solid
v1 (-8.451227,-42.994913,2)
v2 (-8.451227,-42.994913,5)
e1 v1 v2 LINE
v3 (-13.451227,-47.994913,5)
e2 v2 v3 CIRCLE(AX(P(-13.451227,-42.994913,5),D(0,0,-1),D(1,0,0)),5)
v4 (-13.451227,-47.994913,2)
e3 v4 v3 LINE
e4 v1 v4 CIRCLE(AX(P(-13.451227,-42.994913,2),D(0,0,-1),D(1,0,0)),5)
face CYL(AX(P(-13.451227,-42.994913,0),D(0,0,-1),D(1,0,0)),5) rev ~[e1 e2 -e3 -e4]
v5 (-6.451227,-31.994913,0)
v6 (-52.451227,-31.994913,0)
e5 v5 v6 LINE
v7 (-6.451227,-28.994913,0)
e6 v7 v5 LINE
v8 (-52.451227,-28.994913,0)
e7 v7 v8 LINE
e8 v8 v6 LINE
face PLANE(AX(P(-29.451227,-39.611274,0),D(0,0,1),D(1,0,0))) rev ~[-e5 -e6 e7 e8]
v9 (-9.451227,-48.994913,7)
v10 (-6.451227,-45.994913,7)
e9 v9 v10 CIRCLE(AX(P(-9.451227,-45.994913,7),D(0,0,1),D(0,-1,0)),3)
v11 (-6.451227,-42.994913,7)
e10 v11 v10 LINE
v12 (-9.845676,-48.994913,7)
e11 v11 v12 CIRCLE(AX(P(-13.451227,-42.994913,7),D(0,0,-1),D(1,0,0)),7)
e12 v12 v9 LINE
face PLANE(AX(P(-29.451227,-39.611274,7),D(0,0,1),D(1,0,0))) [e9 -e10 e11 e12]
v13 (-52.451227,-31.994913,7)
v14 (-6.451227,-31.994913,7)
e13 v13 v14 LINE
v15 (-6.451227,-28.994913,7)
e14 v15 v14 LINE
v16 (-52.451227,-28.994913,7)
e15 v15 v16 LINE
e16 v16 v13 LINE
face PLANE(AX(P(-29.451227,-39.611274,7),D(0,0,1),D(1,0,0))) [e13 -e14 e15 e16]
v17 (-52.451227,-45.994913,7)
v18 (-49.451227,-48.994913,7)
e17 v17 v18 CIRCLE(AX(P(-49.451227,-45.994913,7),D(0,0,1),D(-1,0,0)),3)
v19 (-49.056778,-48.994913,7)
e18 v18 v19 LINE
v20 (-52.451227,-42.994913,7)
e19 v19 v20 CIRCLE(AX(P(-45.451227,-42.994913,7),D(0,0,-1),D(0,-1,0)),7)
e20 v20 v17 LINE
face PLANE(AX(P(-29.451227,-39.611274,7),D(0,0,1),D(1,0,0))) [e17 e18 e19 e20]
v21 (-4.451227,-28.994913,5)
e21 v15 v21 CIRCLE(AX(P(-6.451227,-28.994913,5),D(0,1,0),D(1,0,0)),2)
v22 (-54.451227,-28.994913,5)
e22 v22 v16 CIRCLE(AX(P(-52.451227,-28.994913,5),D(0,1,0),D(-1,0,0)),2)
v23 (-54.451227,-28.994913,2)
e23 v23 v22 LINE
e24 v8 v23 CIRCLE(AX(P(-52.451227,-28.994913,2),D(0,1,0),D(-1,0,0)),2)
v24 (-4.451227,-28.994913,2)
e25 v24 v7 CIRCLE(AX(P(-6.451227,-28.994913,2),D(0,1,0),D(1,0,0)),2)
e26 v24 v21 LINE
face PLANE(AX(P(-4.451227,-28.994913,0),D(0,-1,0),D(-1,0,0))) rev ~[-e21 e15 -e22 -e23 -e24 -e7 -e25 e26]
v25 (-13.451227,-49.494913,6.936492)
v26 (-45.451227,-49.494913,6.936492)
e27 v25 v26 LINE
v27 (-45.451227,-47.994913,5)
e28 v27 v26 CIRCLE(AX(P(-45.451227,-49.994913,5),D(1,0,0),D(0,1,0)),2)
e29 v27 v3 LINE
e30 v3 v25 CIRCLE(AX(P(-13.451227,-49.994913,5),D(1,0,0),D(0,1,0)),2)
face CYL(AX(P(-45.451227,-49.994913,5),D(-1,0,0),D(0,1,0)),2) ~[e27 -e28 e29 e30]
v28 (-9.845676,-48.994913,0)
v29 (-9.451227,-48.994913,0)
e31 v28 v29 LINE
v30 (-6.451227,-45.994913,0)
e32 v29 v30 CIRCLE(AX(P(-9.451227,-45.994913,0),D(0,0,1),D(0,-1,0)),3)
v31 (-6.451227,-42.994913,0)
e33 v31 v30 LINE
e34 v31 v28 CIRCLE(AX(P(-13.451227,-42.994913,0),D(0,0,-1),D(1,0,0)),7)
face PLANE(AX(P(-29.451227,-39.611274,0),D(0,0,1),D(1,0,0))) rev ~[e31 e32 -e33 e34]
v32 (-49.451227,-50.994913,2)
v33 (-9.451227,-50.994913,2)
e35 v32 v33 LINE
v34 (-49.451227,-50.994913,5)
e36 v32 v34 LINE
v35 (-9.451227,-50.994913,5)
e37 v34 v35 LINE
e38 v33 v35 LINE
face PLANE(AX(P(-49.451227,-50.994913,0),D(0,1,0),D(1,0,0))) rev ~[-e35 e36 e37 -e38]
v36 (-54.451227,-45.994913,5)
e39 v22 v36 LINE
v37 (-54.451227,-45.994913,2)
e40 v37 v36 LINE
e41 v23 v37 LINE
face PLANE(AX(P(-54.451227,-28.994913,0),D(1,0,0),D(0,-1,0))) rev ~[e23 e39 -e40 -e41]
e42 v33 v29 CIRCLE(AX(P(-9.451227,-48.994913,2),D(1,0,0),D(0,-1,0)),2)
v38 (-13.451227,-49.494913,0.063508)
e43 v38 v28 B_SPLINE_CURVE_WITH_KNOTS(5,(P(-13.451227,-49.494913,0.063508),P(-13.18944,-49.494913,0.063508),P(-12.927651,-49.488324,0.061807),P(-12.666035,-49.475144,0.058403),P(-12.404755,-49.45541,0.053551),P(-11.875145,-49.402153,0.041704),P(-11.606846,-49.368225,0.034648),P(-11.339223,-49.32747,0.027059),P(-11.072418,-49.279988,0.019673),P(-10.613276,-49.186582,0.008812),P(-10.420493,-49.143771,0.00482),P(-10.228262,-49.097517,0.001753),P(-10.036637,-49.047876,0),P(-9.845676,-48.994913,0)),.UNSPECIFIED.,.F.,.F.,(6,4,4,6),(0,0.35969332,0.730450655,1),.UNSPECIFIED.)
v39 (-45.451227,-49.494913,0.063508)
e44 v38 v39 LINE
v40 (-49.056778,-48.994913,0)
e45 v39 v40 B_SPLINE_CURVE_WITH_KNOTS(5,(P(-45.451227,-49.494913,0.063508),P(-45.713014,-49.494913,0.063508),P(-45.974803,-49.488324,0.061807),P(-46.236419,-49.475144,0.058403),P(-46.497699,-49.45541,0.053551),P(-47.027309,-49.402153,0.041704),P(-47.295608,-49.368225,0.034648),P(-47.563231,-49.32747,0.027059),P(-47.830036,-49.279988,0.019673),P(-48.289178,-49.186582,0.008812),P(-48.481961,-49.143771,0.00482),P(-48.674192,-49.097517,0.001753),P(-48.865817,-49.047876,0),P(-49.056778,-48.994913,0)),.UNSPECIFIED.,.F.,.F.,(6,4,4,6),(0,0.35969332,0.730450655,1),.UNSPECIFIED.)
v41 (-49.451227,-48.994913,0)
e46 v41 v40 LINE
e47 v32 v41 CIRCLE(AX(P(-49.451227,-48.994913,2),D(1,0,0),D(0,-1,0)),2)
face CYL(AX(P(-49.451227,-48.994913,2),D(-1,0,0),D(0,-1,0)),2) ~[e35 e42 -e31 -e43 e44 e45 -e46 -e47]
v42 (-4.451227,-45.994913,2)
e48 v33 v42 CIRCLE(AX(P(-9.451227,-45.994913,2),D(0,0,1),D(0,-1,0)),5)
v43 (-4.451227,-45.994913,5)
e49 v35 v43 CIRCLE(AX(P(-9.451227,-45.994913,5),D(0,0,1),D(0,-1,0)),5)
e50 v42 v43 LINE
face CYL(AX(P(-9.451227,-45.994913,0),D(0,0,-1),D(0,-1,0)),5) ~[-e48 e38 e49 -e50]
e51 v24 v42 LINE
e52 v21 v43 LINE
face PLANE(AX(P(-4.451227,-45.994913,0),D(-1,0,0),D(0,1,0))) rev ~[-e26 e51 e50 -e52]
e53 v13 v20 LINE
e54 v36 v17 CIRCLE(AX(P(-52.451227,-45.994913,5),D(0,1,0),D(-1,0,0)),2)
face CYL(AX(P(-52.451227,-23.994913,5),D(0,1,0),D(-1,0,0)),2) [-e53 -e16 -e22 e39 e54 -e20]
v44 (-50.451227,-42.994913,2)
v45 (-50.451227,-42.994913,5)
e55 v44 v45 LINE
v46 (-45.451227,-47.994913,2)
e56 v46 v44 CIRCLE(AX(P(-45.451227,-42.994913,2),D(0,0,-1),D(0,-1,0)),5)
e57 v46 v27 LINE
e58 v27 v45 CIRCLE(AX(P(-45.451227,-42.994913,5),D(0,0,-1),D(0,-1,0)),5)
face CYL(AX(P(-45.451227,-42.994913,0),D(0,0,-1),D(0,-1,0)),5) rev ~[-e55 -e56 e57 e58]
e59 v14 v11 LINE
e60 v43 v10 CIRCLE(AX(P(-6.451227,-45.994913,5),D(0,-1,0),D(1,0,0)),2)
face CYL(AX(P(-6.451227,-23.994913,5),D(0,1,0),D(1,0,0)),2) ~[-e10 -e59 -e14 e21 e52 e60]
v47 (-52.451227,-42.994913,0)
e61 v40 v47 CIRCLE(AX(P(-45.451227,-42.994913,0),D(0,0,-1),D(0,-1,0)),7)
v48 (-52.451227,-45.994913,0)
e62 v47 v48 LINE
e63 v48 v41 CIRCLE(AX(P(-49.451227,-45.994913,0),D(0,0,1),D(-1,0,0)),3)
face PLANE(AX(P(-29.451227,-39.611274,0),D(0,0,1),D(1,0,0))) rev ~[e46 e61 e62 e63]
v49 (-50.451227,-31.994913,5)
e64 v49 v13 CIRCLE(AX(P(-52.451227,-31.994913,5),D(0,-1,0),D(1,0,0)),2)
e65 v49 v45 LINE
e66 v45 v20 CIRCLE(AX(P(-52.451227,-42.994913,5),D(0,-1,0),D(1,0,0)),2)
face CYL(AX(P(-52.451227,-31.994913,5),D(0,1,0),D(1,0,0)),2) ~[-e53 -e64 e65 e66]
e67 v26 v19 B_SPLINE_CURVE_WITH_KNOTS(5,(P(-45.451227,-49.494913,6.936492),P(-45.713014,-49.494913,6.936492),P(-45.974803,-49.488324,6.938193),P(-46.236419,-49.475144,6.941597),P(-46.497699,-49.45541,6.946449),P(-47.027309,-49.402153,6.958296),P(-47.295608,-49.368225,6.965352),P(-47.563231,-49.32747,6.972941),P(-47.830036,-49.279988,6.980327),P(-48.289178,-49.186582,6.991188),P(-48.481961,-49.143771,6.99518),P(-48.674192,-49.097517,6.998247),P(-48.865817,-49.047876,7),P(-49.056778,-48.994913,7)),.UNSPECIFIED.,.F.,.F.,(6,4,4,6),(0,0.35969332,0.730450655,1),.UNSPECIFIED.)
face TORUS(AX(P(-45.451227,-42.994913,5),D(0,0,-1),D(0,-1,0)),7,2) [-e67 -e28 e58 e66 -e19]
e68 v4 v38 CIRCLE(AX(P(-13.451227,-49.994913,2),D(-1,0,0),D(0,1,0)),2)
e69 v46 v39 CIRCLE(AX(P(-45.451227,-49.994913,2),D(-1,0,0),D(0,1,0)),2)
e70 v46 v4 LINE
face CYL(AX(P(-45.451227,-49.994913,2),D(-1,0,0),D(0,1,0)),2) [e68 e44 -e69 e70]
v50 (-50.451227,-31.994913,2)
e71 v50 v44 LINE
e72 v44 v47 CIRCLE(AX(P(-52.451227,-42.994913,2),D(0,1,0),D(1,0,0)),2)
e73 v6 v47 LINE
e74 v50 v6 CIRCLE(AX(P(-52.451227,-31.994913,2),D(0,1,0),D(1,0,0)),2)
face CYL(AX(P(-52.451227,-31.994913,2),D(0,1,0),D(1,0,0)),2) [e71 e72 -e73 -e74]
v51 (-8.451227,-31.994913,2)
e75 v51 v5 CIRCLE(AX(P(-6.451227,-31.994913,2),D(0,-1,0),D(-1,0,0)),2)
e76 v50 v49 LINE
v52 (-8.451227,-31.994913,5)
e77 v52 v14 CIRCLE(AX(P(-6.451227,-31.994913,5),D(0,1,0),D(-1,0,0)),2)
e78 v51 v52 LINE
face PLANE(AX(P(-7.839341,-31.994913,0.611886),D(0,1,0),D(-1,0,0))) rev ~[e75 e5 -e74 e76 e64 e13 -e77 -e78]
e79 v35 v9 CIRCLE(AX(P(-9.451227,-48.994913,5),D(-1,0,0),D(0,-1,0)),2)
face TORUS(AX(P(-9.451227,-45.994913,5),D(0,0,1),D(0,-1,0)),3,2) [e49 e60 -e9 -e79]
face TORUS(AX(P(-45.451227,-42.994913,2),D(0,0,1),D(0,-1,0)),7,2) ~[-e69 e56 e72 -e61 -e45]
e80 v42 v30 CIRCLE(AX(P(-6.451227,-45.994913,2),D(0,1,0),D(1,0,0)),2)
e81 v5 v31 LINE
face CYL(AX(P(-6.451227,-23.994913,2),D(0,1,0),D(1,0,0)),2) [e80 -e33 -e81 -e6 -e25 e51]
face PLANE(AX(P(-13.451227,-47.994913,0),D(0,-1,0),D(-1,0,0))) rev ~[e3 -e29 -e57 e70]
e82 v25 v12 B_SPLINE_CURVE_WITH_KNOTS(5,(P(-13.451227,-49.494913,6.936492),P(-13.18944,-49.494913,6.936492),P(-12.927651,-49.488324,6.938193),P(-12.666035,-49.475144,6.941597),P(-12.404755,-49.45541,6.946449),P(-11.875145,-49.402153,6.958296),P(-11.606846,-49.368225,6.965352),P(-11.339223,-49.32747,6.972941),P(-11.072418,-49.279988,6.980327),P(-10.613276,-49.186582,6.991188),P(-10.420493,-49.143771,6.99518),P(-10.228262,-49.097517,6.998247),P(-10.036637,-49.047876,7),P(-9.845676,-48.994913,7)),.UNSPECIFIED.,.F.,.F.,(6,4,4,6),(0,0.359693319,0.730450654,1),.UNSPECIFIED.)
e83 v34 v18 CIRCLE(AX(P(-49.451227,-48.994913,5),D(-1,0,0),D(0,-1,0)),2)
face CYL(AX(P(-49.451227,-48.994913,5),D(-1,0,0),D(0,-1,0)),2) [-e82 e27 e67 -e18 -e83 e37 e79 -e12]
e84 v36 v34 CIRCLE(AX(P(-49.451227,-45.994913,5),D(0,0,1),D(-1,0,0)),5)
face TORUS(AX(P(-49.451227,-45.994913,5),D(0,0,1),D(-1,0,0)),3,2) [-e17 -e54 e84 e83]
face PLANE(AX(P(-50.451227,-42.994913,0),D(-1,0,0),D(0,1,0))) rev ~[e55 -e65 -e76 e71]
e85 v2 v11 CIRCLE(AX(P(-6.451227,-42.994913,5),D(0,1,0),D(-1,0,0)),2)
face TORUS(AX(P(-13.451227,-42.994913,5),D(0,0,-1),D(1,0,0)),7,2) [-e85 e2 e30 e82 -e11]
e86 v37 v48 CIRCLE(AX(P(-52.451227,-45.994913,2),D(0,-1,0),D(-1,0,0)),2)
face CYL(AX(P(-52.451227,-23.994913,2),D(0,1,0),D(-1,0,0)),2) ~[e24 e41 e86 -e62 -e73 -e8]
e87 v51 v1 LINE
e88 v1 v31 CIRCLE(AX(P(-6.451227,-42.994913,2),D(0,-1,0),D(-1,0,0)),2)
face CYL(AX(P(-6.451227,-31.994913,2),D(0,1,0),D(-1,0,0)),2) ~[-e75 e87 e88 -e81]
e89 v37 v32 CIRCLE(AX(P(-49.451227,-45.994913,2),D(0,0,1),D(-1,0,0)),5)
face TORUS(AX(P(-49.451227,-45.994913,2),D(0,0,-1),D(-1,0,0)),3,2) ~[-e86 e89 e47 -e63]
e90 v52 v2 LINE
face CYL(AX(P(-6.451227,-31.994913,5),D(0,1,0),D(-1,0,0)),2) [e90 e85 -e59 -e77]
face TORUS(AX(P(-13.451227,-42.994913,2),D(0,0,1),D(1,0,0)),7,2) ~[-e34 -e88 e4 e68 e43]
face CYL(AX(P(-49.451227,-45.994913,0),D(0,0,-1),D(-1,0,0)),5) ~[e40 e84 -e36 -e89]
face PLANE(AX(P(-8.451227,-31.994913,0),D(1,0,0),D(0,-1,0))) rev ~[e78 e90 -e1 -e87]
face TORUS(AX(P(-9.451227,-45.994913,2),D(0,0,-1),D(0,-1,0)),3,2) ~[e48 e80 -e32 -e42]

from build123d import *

# Parameters (mm, degrees)
F1_DEPTH     = 7
F2_T1_DEPTH  = 32
F2_T3_DEPTH  = 40
F2_T5_DEPTH  = 22
F2_T7_DEPTH  = 11
F2_T10_ANGLE = 90
F2_T12_ANGLE = 90
F2_T14_ANGLE = 90
F2_T16_ANGLE = 90
F2_T18_ANGLE = 90
F2_T20_ANGLE = 90
F2_T22_ANGLE = 90
F2_T24_ANGLE = 90


# Not quite as in the source:
# - a fillet or chamfer that OpenCascade refuses, or shapes differently, is made with other operations: its cross-section is extruded or revolved along the edge and cut away or added


with BuildPart() as f1:
    # F0 (on Top) → F1 (new body)
    with BuildSketch(Plane.XY):
        with BuildLine():
            Line((-4.4512270018, -28.9949133558), (-54.4512270018, -28.9949133558))
            Line((-54.4512270018, -28.9949133558), (-54.4512270018, -45.9949133558))
            ThreePointArc((-54.4512270018, -45.9949133558), (-52.9867609078, -49.5304472618), (-49.4512270018, -50.9949133558))
            Line((-49.4512270018, -50.9949133558), (-9.4512270018, -50.9949133558))
            ThreePointArc((-9.4512270018, -50.9949133558), (-5.9156930959, -49.5304472618), (-4.4512270018, -45.9949133558))
            Line((-4.4512270018, -45.9949133558), (-4.4512270018, -28.9949133558))
        make_face()
        with BuildLine():
            Line((-50.4512270018, -42.9949133558), (-50.4512270018, -31.9949133558))
            Line((-50.4512270018, -31.9949133558), (-8.4512270018, -31.9949133558))
            Line((-8.4512270018, -31.9949133558), (-8.4512270018, -42.9949133558))
            ThreePointArc((-8.4512270018, -42.9949133558), (-9.9156930959, -46.5304472618), (-13.4512270018, -47.9949133558))
            Line((-13.4512270018, -47.9949133558), (-45.4512270018, -47.9949133558))
            ThreePointArc((-45.4512270018, -47.9949133558), (-48.9867609078, -46.5304472618), (-50.4512270018, -42.9949133558))
        make_face(mode=Mode.SUBTRACT)
    extrude(amount=F1_DEPTH)

    # F2: fillet of radius 2 on 4 edges, made by hand

    # F2_s2 → F2_t1 (cut)
    with BuildSketch(Plane.YZ.offset(-45.4512270018)):
        with BuildLine():
            ThreePointArc((-47.9949133558, 5), (-48.5806997934, 6.4142135624), (-49.9949133558, 7))
            Line((-49.9949133558, 7), (-47.9949133558, 7))
            Line((-47.9949133558, 7), (-47.9949133558, 5))
        make_face()
        with BuildLine():
            ThreePointArc((-47.9949133558, 2), (-48.5806997934, 0.5857864376), (-49.9949133558, 0))
            Line((-49.9949133558, 0), (-47.9949133558, 0))
            Line((-47.9949133558, 0), (-47.9949133558, 2))
        make_face()
    extrude(amount=F2_T1_DEPTH, mode=Mode.SUBTRACT)

    # F2_s4 → F2_t3 (cut)
    with BuildSketch(Plane.YZ.offset(-49.4512270018)):
        with BuildLine():
            ThreePointArc((-50.9949133558, 5), (-50.4091269182, 6.4142135624), (-48.9949133558, 7))
            Line((-48.9949133558, 7), (-50.9949133558, 7))
            Line((-50.9949133558, 7), (-50.9949133558, 5))
        make_face()
        with BuildLine():
            ThreePointArc((-50.9949133558, 2), (-50.4091269182, 0.5857864376), (-48.9949133558, 0))
            Line((-48.9949133558, 0), (-50.9949133558, 0))
            Line((-50.9949133558, 0), (-50.9949133558, 2))
        make_face()
    extrude(amount=F2_T3_DEPTH, mode=Mode.SUBTRACT)

    # F2_s6 → F2_t5 (cut)
    with BuildSketch(Plane.XZ.offset(23.9949133558)):
        with BuildLine():
            ThreePointArc((-54.4512270018, 2), (-53.8654405642, 0.5857864376), (-52.4512270018, 0))
            Line((-52.4512270018, 0), (-54.4512270018, 0))
            Line((-54.4512270018, 0), (-54.4512270018, 2))
        make_face()
        with BuildLine():
            ThreePointArc((-4.4512270018, 2), (-5.0370134395, 0.5857864376), (-6.4512270018, 0))
            Line((-6.4512270018, 0), (-4.4512270018, 0))
            Line((-4.4512270018, 0), (-4.4512270018, 2))
        make_face()
        with BuildLine():
            ThreePointArc((-4.4512270018, 5), (-5.0370134395, 6.4142135624), (-6.4512270018, 7))
            Line((-6.4512270018, 7), (-4.4512270018, 7))
            Line((-4.4512270018, 7), (-4.4512270018, 5))
        make_face()
        with BuildLine():
            ThreePointArc((-54.4512270018, 5), (-53.8654405642, 6.4142135624), (-52.4512270018, 7))
            Line((-52.4512270018, 7), (-54.4512270018, 7))
            Line((-54.4512270018, 7), (-54.4512270018, 5))
        make_face()
    extrude(amount=F2_T5_DEPTH, mode=Mode.SUBTRACT)

    # F2_s8 → F2_t7 (cut)
    with BuildSketch(Plane.XZ.offset(31.9949133558)):
        with BuildLine():
            ThreePointArc((-50.4512270018, 2), (-51.0370134395, 0.5857864376), (-52.4512270018, 0))
            Line((-52.4512270018, 0), (-50.4512270018, 0))
            Line((-50.4512270018, 0), (-50.4512270018, 2))
        make_face()
        with BuildLine():
            ThreePointArc((-8.4512270018, 2), (-7.8654405642, 0.5857864376), (-6.4512270018, 0))
            Line((-6.4512270018, 0), (-8.4512270018, 0))
            Line((-8.4512270018, 0), (-8.4512270018, 2))
        make_face()
        with BuildLine():
            ThreePointArc((-50.4512270018, 5), (-51.0370134395, 6.4142135624), (-52.4512270018, 7))
            Line((-52.4512270018, 7), (-50.4512270018, 7))
            Line((-50.4512270018, 7), (-50.4512270018, 5))
        make_face()
        with BuildLine():
            ThreePointArc((-8.4512270018, 5), (-7.8654405642, 6.4142135624), (-6.4512270018, 7))
            Line((-6.4512270018, 7), (-8.4512270018, 7))
            Line((-8.4512270018, 7), (-8.4512270018, 5))
        make_face()
    extrude(amount=F2_T7_DEPTH, mode=Mode.SUBTRACT)

    # F2_s9 → F2_t10 (revolve, cut)
    with BuildSketch(Plane.XZ.offset(42.9949133558)):
        with BuildLine():
            ThreePointArc((-8.4512270018, 2), (-7.8654405642, 0.5857864376), (-6.4512270018, 0))
            Line((-6.4512270018, 0), (-8.4512270018, 0))
            Line((-8.4512270018, 0), (-8.4512270018, 2))
        make_face()
    revolve(axis=Axis((-13.4512270018, -42.9949133558, 0), (0, 0, -1)), revolution_arc=F2_T10_ANGLE, mode=Mode.SUBTRACT)

    # F2_s11 → F2_t12 (revolve, cut)
    with BuildSketch(Plane.YZ.offset(-45.4512270018)):
        with BuildLine():
            ThreePointArc((-47.9949133558, 2), (-48.5806997934, 0.5857864376), (-49.9949133558, 0))
            Line((-49.9949133558, 0), (-47.9949133558, 0))
            Line((-47.9949133558, 0), (-47.9949133558, 2))
        make_face()
    revolve(axis=Axis((-45.4512270018, -42.9949133558, 0), (0, 0, -1)), revolution_arc=F2_T12_ANGLE, mode=Mode.SUBTRACT)

    # F2_s13 → F2_t14 (revolve, cut)
    with BuildSketch(Plane.XZ.offset(45.9949133558)):
        with BuildLine():
            ThreePointArc((-54.4512270018, 2), (-53.8654405642, 0.5857864376), (-52.4512270018, 0))
            Line((-52.4512270018, 0), (-54.4512270018, 0))
            Line((-54.4512270018, 0), (-54.4512270018, 2))
        make_face()
    revolve(axis=Axis((-49.4512270018, -45.9949133558, 0), (0, 0, 1)), revolution_arc=F2_T14_ANGLE, mode=Mode.SUBTRACT)

    # F2_s15 → F2_t16 (revolve, cut)
    with BuildSketch(Plane.YZ.offset(-9.4512270018)):
        with BuildLine():
            ThreePointArc((-50.9949133558, 2), (-50.4091269182, 0.5857864376), (-48.9949133558, 0))
            Line((-48.9949133558, 0), (-50.9949133558, 0))
            Line((-50.9949133558, 0), (-50.9949133558, 2))
        make_face()
    revolve(axis=Axis((-9.4512270018, -45.9949133558, 0), (0, 0, 1)), revolution_arc=F2_T16_ANGLE, mode=Mode.SUBTRACT)

    # F2_s17 → F2_t18 (revolve, cut)
    with BuildSketch(Plane.XZ.offset(45.9949133558)):
        with BuildLine():
            ThreePointArc((-54.4512270018, 5), (-53.8654405642, 6.4142135624), (-52.4512270018, 7))
            Line((-52.4512270018, 7), (-54.4512270018, 7))
            Line((-54.4512270018, 7), (-54.4512270018, 5))
        make_face()
    revolve(axis=Axis((-49.4512270018, -45.9949133558, 7), (0, 0, 1)), revolution_arc=F2_T18_ANGLE, mode=Mode.SUBTRACT)

    # F2_s19 → F2_t20 (revolve, cut)
    with BuildSketch(Plane.YZ.offset(-9.4512270018)):
        with BuildLine():
            ThreePointArc((-50.9949133558, 5), (-50.4091269182, 6.4142135624), (-48.9949133558, 7))
            Line((-48.9949133558, 7), (-50.9949133558, 7))
            Line((-50.9949133558, 7), (-50.9949133558, 5))
        make_face()
    revolve(axis=Axis((-9.4512270018, -45.9949133558, 7), (0, 0, 1)), revolution_arc=F2_T20_ANGLE, mode=Mode.SUBTRACT)

    # F2_s21 → F2_t22 (revolve, cut)
    with BuildSketch(Plane.XZ.offset(42.9949133558)):
        with BuildLine():
            ThreePointArc((-8.4512270018, 5), (-7.8654405642, 6.4142135624), (-6.4512270018, 7))
            Line((-6.4512270018, 7), (-8.4512270018, 7))
            Line((-8.4512270018, 7), (-8.4512270018, 5))
        make_face()
    revolve(axis=Axis((-13.4512270018, -42.9949133558, 7), (0, 0, -1)), revolution_arc=F2_T22_ANGLE, mode=Mode.SUBTRACT)

    # F2_s23 → F2_t24 (revolve, cut)
    with BuildSketch(Plane.YZ.offset(-45.4512270018)):
        with BuildLine():
            ThreePointArc((-47.9949133558, 5), (-48.5806997934, 6.4142135624), (-49.9949133558, 7))
            Line((-49.9949133558, 7), (-47.9949133558, 7))
            Line((-47.9949133558, 7), (-47.9949133558, 5))
        make_face()
    revolve(axis=Axis((-45.4512270018, -42.9949133558, 7), (0, 0, -1)), revolution_arc=F2_T24_ANGLE, mode=Mode.SUBTRACT)


solid = f1.part
